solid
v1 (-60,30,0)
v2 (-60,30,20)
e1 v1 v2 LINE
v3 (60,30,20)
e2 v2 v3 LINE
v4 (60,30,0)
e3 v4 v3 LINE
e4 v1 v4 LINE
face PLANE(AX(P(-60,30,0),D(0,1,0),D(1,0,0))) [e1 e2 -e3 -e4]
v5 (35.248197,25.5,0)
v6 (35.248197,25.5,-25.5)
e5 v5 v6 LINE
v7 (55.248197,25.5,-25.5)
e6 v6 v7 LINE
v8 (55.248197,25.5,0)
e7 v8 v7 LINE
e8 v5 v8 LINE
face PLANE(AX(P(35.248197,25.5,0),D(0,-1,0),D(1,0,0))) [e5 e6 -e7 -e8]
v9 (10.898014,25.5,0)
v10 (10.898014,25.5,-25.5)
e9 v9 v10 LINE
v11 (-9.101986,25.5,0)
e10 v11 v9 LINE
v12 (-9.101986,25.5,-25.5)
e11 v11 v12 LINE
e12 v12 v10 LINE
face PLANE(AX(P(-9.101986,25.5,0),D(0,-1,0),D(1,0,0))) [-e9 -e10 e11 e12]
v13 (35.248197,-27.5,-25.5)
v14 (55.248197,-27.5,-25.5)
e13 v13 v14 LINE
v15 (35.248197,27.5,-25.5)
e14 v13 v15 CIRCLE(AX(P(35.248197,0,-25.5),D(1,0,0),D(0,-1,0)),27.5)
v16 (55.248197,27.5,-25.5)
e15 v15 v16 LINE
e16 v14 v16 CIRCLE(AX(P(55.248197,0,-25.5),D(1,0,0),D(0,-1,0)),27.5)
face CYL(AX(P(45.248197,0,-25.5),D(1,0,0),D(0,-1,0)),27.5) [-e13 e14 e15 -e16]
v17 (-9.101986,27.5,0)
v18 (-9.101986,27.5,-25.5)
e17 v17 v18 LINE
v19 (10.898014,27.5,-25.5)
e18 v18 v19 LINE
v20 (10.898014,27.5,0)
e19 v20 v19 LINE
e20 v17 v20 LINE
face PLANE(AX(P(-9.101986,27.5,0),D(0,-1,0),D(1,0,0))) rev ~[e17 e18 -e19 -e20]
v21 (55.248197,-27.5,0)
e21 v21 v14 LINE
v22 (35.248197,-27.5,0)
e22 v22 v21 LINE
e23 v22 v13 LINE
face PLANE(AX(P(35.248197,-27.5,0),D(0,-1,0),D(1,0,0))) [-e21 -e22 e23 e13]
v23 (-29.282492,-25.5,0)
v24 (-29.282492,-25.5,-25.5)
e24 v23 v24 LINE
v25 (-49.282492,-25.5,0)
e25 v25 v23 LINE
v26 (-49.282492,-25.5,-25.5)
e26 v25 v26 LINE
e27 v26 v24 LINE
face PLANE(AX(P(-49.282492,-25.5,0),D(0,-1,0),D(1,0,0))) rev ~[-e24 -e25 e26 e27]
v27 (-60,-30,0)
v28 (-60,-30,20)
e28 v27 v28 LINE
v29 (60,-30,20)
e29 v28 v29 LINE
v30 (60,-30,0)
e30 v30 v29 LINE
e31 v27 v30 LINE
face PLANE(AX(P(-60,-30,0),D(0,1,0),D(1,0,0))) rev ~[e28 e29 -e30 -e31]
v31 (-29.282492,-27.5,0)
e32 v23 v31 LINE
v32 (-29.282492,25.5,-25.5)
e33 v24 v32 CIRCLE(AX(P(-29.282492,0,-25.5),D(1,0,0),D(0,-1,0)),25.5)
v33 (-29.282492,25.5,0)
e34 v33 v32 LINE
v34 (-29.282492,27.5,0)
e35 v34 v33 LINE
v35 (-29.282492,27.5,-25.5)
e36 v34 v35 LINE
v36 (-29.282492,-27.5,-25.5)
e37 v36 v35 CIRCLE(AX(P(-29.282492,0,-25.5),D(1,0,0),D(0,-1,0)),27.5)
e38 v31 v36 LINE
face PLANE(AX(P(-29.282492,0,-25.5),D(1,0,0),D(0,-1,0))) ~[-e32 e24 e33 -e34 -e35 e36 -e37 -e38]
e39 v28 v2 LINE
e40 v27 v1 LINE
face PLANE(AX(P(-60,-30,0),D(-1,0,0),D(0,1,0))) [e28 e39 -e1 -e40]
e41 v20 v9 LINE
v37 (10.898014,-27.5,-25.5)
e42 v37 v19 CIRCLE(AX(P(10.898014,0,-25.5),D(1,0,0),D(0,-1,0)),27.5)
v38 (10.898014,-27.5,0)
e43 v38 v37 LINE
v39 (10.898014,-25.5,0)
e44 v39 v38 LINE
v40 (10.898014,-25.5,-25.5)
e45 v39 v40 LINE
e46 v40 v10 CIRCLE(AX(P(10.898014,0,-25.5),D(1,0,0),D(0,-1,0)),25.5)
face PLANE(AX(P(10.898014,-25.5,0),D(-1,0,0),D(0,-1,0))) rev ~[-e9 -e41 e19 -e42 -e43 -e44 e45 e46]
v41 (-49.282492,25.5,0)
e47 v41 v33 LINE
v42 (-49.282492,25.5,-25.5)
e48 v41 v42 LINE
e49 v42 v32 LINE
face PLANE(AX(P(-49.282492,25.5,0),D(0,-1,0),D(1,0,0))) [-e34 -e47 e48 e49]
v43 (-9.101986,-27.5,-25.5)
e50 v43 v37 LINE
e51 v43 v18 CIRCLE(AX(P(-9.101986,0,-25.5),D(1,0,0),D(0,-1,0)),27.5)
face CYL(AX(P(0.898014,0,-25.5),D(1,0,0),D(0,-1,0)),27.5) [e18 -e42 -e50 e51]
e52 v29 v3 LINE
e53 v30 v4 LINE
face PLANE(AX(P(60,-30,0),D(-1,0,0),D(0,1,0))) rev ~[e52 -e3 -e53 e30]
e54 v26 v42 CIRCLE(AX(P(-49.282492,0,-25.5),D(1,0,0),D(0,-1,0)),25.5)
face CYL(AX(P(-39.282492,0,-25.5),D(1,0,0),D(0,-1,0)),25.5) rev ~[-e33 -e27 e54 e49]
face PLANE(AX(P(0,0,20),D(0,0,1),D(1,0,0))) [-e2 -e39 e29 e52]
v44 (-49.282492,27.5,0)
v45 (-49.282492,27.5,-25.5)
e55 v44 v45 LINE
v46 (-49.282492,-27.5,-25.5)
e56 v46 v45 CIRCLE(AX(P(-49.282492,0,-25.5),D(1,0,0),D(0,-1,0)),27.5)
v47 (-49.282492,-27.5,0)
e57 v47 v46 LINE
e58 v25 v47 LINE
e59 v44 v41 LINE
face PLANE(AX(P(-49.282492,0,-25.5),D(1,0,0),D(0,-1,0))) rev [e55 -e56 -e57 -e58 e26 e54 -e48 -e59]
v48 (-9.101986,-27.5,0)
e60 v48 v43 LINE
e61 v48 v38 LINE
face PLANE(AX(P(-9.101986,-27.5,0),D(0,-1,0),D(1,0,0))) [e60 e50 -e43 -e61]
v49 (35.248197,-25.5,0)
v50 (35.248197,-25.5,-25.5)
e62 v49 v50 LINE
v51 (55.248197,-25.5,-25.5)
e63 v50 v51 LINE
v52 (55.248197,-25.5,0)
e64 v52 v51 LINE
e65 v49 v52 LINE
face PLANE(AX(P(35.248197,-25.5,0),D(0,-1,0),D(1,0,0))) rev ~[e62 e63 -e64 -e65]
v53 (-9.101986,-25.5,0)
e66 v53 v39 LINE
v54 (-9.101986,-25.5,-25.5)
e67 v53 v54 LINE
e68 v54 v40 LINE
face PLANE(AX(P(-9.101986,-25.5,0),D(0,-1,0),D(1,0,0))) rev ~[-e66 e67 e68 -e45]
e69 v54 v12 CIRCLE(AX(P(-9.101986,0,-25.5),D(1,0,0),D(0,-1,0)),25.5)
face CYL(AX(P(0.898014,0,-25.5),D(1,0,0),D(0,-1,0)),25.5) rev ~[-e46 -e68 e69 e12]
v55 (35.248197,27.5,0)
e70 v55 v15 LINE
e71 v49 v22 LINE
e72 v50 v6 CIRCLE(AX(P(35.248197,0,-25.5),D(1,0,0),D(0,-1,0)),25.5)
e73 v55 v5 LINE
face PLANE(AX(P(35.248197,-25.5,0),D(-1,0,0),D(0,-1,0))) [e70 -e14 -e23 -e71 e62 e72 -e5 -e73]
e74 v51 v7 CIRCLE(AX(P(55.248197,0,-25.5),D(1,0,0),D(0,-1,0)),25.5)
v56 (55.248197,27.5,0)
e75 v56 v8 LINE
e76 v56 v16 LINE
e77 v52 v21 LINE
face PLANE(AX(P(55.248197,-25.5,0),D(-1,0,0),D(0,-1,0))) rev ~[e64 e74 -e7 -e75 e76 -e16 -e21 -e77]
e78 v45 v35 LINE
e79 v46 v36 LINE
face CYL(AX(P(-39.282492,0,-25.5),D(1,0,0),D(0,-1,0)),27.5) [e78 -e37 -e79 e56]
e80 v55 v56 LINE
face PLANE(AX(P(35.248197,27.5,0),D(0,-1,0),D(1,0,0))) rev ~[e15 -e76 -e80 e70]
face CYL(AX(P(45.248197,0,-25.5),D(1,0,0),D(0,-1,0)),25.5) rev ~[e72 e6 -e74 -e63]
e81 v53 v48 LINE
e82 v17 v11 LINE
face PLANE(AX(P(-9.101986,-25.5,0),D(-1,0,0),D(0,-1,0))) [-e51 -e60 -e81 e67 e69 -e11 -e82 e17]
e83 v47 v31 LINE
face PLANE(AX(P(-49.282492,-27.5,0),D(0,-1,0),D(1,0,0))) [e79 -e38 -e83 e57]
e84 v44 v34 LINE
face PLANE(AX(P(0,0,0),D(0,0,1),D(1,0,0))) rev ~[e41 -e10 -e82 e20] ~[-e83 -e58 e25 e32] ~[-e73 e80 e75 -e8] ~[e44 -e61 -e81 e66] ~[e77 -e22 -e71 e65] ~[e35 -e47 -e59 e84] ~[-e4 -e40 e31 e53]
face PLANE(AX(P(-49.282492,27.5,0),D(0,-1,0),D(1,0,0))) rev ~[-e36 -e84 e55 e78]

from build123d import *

# Parameters (mm, degrees)
F0_W      = 120
F0_H      = 60
F1_DEPTH  = 20
F2_W      = 20
F2_H      = 2
F3_DEPTH  = 25.5
F4_W      = 20
F4_H      = 2
F3_FACE_W = 20
F3_FACE_H = 2
F5_ANGLE  = 180


# Not quite as in the source:
# - a feature names something its author has since deleted; it is built from what else it names


with BuildPart() as f1:
    # F0 (on Top) → F1 (new body)
    with BuildSketch(Plane.XY):
        Rectangle(F0_W, F0_H)
    extrude(amount=F1_DEPTH)

    # F2 (on face) → F3 (join)
    with BuildSketch(Plane(origin=(0, 0, 0), x_dir=(1, 0, 0), z_dir=(0, 0, -1))):
        with Locations((-39.2824916542, 26.5)):
            Rectangle(F2_W, F2_H)
        with Locations((-39.2824916542, -26.5)):
            Rectangle(F2_W, F2_H)
        with Locations((0.8980135992, 26.5)):
            Rectangle(F2_W, F2_H)
        with Locations((0.8980135992, -26.5)):
            Rectangle(F2_W, F2_H)
        with Locations((45.2481971681, 26.5)):
            Rectangle(F2_W, F2_H)
        with Locations((45.2481971681, -26.5)):
            Rectangle(F2_W, F2_H)
    extrude(amount=F3_DEPTH)

    # F4 (on face) + F3_face (on face) → F5 (revolve)
    with BuildSketch(Plane(origin=(0, 0, -25.5), x_dir=(1, 0, 0), z_dir=(0, 0, -1))):
        with Locations((-39.2824916542, 26.5)):
            Rectangle(F4_W, F4_H)
    with BuildSketch(Plane(origin=(-39.2824916542, -26.5, -25.5), x_dir=(1, 0, 0), z_dir=(0, 0, -1))):
        with Locations((40.1805052534, 0)):
            Rectangle(F3_FACE_W, F3_FACE_H)
        with Locations((84.5306888223, 0)):
            Rectangle(F3_FACE_W, F3_FACE_H)
    revolve(axis=Axis((1.9900724292, 0, -25.5), (1, 0, 0)), revolution_arc=F5_ANGLE)


solid = f1.part
